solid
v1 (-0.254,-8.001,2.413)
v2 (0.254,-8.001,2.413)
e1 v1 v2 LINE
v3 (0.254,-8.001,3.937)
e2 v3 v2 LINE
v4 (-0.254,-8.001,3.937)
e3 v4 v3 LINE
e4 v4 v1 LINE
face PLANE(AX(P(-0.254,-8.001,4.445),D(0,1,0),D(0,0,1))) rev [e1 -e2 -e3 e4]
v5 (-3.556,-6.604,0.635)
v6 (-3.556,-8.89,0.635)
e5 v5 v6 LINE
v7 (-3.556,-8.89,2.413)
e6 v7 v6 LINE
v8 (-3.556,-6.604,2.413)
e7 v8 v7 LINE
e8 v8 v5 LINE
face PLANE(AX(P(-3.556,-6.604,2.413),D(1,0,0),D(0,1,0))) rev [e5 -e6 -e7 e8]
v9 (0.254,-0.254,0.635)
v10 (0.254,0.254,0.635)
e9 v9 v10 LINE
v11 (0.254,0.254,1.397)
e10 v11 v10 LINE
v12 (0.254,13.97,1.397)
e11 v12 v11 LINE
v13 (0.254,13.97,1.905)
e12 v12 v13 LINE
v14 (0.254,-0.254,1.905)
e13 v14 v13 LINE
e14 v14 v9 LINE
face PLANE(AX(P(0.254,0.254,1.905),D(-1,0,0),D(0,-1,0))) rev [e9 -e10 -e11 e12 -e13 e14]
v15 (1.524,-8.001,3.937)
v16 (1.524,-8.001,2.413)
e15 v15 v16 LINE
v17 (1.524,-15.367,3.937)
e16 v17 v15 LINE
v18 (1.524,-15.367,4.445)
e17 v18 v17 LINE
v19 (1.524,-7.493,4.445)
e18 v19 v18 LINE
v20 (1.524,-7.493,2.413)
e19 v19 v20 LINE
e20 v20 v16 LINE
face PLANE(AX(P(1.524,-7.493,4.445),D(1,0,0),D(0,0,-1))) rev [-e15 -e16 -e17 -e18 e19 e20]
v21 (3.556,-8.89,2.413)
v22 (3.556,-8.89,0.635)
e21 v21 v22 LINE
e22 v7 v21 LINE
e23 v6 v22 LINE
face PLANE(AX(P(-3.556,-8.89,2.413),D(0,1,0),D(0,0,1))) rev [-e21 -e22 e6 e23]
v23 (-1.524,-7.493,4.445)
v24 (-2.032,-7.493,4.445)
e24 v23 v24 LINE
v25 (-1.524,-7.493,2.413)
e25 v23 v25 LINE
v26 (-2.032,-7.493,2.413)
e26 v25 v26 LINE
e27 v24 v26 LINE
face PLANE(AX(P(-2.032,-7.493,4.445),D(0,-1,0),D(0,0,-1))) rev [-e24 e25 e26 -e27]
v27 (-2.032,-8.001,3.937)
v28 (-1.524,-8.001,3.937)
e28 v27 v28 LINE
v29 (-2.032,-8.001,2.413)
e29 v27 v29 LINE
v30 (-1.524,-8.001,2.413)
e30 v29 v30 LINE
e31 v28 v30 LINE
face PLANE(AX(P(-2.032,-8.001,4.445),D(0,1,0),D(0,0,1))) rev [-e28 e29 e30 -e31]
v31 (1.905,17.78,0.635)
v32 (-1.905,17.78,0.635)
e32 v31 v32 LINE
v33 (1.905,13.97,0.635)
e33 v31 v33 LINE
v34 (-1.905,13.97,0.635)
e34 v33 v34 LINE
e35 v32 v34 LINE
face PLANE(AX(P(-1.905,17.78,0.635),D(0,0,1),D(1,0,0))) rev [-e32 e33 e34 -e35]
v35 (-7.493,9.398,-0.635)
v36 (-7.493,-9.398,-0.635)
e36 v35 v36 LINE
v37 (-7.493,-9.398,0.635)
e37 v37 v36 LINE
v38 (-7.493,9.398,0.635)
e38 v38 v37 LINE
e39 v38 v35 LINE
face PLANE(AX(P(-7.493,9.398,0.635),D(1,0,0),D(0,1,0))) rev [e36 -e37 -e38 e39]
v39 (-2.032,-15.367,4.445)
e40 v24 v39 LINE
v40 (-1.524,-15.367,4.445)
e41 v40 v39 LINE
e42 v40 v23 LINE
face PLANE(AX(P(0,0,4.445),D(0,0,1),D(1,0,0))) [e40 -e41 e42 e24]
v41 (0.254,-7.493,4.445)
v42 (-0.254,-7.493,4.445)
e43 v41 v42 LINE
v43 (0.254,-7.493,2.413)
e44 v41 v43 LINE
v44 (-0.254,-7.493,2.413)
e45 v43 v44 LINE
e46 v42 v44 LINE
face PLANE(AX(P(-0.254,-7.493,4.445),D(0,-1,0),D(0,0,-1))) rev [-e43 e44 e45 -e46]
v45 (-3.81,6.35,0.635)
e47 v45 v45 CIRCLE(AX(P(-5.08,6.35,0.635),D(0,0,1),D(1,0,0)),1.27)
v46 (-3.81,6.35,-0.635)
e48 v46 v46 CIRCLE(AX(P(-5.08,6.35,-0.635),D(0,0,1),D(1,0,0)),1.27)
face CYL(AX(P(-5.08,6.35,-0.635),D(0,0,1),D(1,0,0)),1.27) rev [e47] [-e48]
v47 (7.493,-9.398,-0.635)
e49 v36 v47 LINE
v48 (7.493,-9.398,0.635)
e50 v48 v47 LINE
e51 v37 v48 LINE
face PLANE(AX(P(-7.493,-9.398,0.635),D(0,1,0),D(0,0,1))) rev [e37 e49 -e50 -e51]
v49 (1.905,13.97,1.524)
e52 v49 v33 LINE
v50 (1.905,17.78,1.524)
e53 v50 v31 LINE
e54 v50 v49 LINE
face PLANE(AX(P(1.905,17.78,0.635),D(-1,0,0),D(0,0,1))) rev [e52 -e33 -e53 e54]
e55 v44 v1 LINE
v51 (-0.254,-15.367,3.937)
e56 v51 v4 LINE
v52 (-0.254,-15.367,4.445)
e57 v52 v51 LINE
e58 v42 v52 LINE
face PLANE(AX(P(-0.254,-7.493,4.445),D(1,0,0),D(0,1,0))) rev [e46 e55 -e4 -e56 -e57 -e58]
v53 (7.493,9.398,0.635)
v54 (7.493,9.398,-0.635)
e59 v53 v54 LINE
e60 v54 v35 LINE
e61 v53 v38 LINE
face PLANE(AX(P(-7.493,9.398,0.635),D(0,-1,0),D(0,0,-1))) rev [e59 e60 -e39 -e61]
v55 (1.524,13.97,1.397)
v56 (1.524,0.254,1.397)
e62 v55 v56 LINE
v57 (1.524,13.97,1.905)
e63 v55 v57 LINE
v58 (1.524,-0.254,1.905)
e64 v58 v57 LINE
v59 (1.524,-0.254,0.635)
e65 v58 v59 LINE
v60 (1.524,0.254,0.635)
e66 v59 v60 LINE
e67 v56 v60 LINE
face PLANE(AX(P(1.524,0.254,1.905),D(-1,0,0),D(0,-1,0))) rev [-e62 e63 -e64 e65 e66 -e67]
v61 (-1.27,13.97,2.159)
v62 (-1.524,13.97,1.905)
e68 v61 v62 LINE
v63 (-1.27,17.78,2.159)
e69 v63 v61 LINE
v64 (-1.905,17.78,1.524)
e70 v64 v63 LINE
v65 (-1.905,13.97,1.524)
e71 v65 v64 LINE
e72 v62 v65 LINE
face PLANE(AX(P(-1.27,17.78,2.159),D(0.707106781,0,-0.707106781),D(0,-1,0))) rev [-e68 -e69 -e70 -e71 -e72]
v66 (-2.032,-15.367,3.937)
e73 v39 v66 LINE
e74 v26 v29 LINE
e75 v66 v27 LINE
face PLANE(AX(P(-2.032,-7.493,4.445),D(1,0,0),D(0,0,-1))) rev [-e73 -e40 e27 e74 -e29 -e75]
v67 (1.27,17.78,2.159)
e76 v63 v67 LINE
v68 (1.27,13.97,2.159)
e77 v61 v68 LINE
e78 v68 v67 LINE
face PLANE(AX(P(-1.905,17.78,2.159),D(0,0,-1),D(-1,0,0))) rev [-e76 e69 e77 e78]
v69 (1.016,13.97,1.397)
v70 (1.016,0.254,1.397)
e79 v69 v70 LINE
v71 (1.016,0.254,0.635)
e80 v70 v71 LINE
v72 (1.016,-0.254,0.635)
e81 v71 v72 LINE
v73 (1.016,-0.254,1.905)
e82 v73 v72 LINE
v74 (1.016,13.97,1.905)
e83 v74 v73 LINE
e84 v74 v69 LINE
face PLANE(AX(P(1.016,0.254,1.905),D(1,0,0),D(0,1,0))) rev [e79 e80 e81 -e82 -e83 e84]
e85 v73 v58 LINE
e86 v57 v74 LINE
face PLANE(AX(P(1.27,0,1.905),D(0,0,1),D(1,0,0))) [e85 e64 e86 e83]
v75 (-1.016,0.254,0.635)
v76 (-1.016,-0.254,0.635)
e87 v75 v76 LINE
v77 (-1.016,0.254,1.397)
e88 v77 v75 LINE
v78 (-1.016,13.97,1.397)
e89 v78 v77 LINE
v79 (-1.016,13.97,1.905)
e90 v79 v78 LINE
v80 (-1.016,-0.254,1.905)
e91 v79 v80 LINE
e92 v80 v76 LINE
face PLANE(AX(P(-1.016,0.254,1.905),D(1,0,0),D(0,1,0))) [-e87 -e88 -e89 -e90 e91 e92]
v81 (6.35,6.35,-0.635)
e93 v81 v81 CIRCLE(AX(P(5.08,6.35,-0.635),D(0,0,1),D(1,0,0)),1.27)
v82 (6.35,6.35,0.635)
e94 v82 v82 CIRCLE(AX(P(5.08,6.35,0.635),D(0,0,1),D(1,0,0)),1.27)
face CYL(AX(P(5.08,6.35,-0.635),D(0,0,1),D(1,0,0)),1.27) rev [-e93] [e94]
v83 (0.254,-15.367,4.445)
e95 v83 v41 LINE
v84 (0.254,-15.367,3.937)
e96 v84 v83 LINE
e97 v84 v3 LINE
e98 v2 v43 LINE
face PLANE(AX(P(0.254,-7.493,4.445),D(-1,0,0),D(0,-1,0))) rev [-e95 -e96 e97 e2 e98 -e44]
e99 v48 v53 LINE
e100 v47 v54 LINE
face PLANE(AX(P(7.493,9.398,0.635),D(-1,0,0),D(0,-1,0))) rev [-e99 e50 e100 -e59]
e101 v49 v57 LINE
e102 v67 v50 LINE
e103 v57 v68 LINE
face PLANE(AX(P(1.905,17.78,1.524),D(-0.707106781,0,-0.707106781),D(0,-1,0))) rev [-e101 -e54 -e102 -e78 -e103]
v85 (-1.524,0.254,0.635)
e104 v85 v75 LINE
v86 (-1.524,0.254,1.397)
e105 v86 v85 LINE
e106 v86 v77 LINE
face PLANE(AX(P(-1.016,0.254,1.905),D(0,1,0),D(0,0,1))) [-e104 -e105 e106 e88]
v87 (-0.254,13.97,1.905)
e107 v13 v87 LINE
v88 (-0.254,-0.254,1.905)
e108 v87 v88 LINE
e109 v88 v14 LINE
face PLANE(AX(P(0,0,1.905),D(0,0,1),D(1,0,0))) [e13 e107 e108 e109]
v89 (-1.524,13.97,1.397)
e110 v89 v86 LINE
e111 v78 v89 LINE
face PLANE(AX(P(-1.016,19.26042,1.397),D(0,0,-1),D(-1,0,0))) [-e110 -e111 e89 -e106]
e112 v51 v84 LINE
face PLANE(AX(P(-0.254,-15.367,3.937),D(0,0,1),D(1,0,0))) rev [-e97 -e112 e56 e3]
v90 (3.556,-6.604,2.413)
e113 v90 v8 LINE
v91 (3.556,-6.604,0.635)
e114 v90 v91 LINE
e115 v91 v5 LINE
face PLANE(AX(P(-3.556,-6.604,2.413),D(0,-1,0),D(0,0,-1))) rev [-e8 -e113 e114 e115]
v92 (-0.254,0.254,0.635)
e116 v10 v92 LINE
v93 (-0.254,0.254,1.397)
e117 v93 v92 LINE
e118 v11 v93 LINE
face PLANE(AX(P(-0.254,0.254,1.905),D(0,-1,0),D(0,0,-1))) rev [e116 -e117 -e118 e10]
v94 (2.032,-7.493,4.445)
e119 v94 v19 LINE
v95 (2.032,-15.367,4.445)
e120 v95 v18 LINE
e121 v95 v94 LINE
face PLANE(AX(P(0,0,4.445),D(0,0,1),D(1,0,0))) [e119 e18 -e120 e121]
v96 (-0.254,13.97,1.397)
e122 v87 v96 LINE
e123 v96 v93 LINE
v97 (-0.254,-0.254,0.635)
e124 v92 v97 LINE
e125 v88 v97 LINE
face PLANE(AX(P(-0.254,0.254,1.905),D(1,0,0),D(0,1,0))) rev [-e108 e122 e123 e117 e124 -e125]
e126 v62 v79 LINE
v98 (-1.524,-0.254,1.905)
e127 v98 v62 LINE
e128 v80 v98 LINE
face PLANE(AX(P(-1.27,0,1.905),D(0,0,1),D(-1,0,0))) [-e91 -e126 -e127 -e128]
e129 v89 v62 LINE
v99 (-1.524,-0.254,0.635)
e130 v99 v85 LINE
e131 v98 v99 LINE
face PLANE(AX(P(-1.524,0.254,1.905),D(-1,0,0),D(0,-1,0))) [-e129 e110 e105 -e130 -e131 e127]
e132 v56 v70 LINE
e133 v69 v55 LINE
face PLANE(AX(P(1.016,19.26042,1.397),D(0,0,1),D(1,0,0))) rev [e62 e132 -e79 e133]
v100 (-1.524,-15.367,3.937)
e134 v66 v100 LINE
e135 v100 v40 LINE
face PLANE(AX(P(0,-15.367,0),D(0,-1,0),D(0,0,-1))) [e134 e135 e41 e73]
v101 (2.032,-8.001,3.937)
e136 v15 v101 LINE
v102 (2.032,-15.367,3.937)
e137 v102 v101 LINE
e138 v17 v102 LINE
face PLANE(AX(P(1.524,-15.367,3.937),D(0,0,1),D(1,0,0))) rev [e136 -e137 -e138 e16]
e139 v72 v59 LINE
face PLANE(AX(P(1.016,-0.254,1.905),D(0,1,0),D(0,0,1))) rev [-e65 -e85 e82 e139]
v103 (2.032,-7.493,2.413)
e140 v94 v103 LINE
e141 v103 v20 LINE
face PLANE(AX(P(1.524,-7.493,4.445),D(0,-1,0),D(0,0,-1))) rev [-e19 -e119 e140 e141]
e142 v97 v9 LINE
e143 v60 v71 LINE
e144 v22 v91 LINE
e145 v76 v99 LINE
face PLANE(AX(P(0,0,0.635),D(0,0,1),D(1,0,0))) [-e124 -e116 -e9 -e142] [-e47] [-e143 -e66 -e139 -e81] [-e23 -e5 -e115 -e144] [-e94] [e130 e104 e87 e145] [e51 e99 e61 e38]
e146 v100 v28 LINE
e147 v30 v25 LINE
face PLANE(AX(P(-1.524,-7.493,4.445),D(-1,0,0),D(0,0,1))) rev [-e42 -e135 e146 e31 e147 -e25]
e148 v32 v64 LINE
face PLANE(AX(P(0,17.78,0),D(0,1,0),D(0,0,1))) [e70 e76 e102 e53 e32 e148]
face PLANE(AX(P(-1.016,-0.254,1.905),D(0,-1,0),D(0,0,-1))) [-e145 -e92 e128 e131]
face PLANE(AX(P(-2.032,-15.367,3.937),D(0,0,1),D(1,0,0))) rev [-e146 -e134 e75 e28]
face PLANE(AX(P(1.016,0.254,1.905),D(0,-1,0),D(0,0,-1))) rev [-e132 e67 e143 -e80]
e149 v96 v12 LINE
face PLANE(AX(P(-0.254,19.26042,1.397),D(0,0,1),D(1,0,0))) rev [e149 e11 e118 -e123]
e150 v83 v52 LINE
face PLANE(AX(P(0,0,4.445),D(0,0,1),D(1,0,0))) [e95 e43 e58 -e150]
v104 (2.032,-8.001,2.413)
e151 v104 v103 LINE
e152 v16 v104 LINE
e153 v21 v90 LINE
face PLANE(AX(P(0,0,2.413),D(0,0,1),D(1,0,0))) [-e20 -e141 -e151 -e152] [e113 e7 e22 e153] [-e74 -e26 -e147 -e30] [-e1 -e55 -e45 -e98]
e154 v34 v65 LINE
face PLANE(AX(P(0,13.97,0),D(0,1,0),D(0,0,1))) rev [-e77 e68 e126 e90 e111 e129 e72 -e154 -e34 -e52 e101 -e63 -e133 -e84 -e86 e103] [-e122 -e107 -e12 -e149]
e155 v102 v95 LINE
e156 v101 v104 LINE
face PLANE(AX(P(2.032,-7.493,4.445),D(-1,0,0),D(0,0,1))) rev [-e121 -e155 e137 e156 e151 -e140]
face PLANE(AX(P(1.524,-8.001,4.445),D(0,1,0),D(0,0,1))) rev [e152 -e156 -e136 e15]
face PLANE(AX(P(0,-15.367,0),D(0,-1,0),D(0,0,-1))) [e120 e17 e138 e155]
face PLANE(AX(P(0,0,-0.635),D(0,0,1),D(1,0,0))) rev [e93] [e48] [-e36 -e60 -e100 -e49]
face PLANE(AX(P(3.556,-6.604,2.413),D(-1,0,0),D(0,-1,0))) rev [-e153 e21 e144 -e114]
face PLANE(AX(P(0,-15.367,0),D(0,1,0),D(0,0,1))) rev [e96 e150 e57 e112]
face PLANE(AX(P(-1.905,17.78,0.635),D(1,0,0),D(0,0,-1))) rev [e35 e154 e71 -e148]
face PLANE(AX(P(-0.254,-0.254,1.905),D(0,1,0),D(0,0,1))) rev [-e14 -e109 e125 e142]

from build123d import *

# Parameters (mm, degrees)
SKETCH1_W               = 14.986
SKETCH1_H               = 18.796
BOSS_EXTRUDE1_DEPTH     = 0.635
SKETCH2_W               = 7.112
SKETCH2_H               = 2.286
BOSS_EXTRUDE2_DEPTH     = 1.778
SKETCH3_W               = 0.508
SKETCH3_H               = 0.508
BOSS_EXTRUDE3_DEPTH     = 2.032
SKETCH4_W               = 0.508
SKETCH4_H               = 0.508
BOSS_EXTRUDE4_DEPTH     = 7.366
CUT_EXTRUDE1_DEPTH      = 18.515873886
CUT_EXTRUDE1_DEPTH_BACK = 18.515873886
SKETCH5_R               = 1.27
SKETCH6_W               = 0.508
SKETCH6_H               = 0.508
BOSS_EXTRUDE5_DEPTH     = 1.27
SKETCH7_W               = 0.508
SKETCH7_H               = 0.508
BOSS_EXTRUDE6_DEPTH     = 13.716
LPATTERN1_COUNT         = 2
LPATTERN1_PITCH         = 1.27
MIRROR1_COPY_1_SKETCH_W = 0.508
MIRROR1_COPY_1_SKETCH_H = 0.508
MIRROR1_COPY_1_DEPTH    = 1.27
MIRROR1_COPY_2_SKETCH_W = 0.508
MIRROR1_COPY_2_SKETCH_H = 0.508
MIRROR1_COPY_2_DEPTH    = 13.716
MIRROR1_COPY_3_SKETCH_W = 0.508
MIRROR1_COPY_3_SKETCH_H = 0.508
MIRROR1_COPY_3_DEPTH    = 1.27
MIRROR1_COPY_4_SKETCH_W = 0.508
MIRROR1_COPY_4_SKETCH_H = 0.508
MIRROR1_COPY_4_DEPTH    = 13.716
SKETCH8_W               = 3.81
SKETCH8_H               = 1.524
BOSS_EXTRUDE7_DEPTH     = 3.81
CHAMFER1_SIZE           = 0.635


with BuildPart() as part:
    # Sketch1 → Boss-Extrude1 (new, symmetric)
    with BuildSketch(Plane.XY):
        Rectangle(SKETCH1_W, SKETCH1_H)
    extrude(amount=BOSS_EXTRUDE1_DEPTH, both=True)

    # Sketch2 → Boss-Extrude2 (add)
    with BuildSketch(Plane.XY.offset(0.635)):
        with Locations((0, -7.747)):
            Rectangle(SKETCH2_W, SKETCH2_H)
    extrude(amount=BOSS_EXTRUDE2_DEPTH)

    # Sketch3 → Boss-Extrude3 (add)
    with BuildSketch(Plane.XY.offset(2.413)):
        with Locations((-1.778, -7.747)):
            Rectangle(SKETCH3_W, SKETCH3_H)
        with Locations((0, -7.747)):
            Rectangle(SKETCH3_W, SKETCH3_H)
        with Locations((1.778, -7.747)):
            Rectangle(SKETCH3_W, SKETCH3_H)
    extrude(amount=BOSS_EXTRUDE3_DEPTH)

    # Sketch4 → Boss-Extrude4 (add)
    with BuildSketch(Plane.XZ.offset(8.001)):
        with Locations((-1.778, 4.191)):
            Rectangle(SKETCH4_W, SKETCH4_H)
        with Locations((0, 4.191)):
            Rectangle(SKETCH4_W, SKETCH4_H)
        with Locations((1.778, 4.191)):
            Rectangle(SKETCH4_W, SKETCH4_H)
    extrude(amount=BOSS_EXTRUDE4_DEPTH)

    # Sketch5 → Cut-Extrude1 (cut, two sides: drawn at the far end of the back side and taken through both)
    with BuildSketch(Plane.XY.offset(0.635).offset(-CUT_EXTRUDE1_DEPTH_BACK)):
        with Locations((-5.08, 6.35)):
            Circle(SKETCH5_R)
        with Locations((5.08, 6.35)):
            Circle(SKETCH5_R)
    extrude(amount=CUT_EXTRUDE1_DEPTH + CUT_EXTRUDE1_DEPTH_BACK, mode=Mode.SUBTRACT)

    # Sketch6 → Boss-Extrude5 (add)
    with BuildSketch(Plane.XY.offset(0.635)):
        Rectangle(SKETCH6_W, SKETCH6_H)
    boss_extrude5 = extrude(amount=BOSS_EXTRUDE5_DEPTH)

    # Sketch7 → Boss-Extrude6 (add)
    with BuildSketch(Plane(origin=(0, 0.254, 0), x_dir=(1, 0, 0), z_dir=(0, 1, 0))):
        with Locations((0, -1.651)):
            Rectangle(SKETCH7_W, SKETCH7_H)
    boss_extrude6 = extrude(amount=BOSS_EXTRUDE6_DEPTH)

    # LPattern1: Boss-Extrude5, Boss-Extrude6 ×2
    with Locations(*[(i * LPATTERN1_PITCH, 0, 0) for i in range(1, LPATTERN1_COUNT)]):
        add(boss_extrude5)
        add(boss_extrude6)

    # Mirror1 copy 1 sketch → Mirror1 copy 1 (add)
    with BuildSketch(Plane(origin=(-1.27, 0, 0.635), x_dir=(-1, 0, 0), z_dir=(0, 0, 1))):
        Rectangle(MIRROR1_COPY_1_SKETCH_W, MIRROR1_COPY_1_SKETCH_H)
    extrude(amount=MIRROR1_COPY_1_DEPTH)

    # Mirror1 copy 2 sketch → Mirror1 copy 2 (add)
    with BuildSketch(Plane(origin=(-1.27, 0.254, 0), x_dir=(-1, 0, 0), z_dir=(0, 1, 0))):
        with Locations((0, 1.651)):
            Rectangle(MIRROR1_COPY_2_SKETCH_W, MIRROR1_COPY_2_SKETCH_H)
    extrude(amount=MIRROR1_COPY_2_DEPTH)

    # Mirror1 copy 3 sketch → Mirror1 copy 3 (add)
    with BuildSketch(Plane(origin=(0, 0, 0.635), x_dir=(-1, 0, 0), z_dir=(0, 0, 1))):
        Rectangle(MIRROR1_COPY_3_SKETCH_W, MIRROR1_COPY_3_SKETCH_H)
    extrude(amount=MIRROR1_COPY_3_DEPTH)

    # Mirror1 copy 4 sketch → Mirror1 copy 4 (add)
    with BuildSketch(Plane(origin=(0, 0.254, 0), x_dir=(-1, 0, 0), z_dir=(0, 1, 0))):
        with Locations((0, 1.651)):
            Rectangle(MIRROR1_COPY_4_SKETCH_W, MIRROR1_COPY_4_SKETCH_H)
    extrude(amount=MIRROR1_COPY_4_DEPTH)

    # Sketch8 → Boss-Extrude7 (add)
    with BuildSketch(Plane(origin=(0, 13.97, 0), x_dir=(1, 0, 0), z_dir=(0, 1, 0))):
        with Locations((0, -1.397)):
            Rectangle(SKETCH8_W, SKETCH8_H)
    extrude(amount=BOSS_EXTRUDE7_DEPTH)

    # Chamfer1
    chamfer1_edges = [part.edges().sort_by_distance(p)[0] for p in [
        (1.905, 15.875, 2.159),
        (-1.905, 15.875, 2.159),
    ]]
    chamfer(chamfer1_edges, length=CHAMFER1_SIZE - 0.0001)  # a hair under: the kernel refuses the full size


solid = part.part
